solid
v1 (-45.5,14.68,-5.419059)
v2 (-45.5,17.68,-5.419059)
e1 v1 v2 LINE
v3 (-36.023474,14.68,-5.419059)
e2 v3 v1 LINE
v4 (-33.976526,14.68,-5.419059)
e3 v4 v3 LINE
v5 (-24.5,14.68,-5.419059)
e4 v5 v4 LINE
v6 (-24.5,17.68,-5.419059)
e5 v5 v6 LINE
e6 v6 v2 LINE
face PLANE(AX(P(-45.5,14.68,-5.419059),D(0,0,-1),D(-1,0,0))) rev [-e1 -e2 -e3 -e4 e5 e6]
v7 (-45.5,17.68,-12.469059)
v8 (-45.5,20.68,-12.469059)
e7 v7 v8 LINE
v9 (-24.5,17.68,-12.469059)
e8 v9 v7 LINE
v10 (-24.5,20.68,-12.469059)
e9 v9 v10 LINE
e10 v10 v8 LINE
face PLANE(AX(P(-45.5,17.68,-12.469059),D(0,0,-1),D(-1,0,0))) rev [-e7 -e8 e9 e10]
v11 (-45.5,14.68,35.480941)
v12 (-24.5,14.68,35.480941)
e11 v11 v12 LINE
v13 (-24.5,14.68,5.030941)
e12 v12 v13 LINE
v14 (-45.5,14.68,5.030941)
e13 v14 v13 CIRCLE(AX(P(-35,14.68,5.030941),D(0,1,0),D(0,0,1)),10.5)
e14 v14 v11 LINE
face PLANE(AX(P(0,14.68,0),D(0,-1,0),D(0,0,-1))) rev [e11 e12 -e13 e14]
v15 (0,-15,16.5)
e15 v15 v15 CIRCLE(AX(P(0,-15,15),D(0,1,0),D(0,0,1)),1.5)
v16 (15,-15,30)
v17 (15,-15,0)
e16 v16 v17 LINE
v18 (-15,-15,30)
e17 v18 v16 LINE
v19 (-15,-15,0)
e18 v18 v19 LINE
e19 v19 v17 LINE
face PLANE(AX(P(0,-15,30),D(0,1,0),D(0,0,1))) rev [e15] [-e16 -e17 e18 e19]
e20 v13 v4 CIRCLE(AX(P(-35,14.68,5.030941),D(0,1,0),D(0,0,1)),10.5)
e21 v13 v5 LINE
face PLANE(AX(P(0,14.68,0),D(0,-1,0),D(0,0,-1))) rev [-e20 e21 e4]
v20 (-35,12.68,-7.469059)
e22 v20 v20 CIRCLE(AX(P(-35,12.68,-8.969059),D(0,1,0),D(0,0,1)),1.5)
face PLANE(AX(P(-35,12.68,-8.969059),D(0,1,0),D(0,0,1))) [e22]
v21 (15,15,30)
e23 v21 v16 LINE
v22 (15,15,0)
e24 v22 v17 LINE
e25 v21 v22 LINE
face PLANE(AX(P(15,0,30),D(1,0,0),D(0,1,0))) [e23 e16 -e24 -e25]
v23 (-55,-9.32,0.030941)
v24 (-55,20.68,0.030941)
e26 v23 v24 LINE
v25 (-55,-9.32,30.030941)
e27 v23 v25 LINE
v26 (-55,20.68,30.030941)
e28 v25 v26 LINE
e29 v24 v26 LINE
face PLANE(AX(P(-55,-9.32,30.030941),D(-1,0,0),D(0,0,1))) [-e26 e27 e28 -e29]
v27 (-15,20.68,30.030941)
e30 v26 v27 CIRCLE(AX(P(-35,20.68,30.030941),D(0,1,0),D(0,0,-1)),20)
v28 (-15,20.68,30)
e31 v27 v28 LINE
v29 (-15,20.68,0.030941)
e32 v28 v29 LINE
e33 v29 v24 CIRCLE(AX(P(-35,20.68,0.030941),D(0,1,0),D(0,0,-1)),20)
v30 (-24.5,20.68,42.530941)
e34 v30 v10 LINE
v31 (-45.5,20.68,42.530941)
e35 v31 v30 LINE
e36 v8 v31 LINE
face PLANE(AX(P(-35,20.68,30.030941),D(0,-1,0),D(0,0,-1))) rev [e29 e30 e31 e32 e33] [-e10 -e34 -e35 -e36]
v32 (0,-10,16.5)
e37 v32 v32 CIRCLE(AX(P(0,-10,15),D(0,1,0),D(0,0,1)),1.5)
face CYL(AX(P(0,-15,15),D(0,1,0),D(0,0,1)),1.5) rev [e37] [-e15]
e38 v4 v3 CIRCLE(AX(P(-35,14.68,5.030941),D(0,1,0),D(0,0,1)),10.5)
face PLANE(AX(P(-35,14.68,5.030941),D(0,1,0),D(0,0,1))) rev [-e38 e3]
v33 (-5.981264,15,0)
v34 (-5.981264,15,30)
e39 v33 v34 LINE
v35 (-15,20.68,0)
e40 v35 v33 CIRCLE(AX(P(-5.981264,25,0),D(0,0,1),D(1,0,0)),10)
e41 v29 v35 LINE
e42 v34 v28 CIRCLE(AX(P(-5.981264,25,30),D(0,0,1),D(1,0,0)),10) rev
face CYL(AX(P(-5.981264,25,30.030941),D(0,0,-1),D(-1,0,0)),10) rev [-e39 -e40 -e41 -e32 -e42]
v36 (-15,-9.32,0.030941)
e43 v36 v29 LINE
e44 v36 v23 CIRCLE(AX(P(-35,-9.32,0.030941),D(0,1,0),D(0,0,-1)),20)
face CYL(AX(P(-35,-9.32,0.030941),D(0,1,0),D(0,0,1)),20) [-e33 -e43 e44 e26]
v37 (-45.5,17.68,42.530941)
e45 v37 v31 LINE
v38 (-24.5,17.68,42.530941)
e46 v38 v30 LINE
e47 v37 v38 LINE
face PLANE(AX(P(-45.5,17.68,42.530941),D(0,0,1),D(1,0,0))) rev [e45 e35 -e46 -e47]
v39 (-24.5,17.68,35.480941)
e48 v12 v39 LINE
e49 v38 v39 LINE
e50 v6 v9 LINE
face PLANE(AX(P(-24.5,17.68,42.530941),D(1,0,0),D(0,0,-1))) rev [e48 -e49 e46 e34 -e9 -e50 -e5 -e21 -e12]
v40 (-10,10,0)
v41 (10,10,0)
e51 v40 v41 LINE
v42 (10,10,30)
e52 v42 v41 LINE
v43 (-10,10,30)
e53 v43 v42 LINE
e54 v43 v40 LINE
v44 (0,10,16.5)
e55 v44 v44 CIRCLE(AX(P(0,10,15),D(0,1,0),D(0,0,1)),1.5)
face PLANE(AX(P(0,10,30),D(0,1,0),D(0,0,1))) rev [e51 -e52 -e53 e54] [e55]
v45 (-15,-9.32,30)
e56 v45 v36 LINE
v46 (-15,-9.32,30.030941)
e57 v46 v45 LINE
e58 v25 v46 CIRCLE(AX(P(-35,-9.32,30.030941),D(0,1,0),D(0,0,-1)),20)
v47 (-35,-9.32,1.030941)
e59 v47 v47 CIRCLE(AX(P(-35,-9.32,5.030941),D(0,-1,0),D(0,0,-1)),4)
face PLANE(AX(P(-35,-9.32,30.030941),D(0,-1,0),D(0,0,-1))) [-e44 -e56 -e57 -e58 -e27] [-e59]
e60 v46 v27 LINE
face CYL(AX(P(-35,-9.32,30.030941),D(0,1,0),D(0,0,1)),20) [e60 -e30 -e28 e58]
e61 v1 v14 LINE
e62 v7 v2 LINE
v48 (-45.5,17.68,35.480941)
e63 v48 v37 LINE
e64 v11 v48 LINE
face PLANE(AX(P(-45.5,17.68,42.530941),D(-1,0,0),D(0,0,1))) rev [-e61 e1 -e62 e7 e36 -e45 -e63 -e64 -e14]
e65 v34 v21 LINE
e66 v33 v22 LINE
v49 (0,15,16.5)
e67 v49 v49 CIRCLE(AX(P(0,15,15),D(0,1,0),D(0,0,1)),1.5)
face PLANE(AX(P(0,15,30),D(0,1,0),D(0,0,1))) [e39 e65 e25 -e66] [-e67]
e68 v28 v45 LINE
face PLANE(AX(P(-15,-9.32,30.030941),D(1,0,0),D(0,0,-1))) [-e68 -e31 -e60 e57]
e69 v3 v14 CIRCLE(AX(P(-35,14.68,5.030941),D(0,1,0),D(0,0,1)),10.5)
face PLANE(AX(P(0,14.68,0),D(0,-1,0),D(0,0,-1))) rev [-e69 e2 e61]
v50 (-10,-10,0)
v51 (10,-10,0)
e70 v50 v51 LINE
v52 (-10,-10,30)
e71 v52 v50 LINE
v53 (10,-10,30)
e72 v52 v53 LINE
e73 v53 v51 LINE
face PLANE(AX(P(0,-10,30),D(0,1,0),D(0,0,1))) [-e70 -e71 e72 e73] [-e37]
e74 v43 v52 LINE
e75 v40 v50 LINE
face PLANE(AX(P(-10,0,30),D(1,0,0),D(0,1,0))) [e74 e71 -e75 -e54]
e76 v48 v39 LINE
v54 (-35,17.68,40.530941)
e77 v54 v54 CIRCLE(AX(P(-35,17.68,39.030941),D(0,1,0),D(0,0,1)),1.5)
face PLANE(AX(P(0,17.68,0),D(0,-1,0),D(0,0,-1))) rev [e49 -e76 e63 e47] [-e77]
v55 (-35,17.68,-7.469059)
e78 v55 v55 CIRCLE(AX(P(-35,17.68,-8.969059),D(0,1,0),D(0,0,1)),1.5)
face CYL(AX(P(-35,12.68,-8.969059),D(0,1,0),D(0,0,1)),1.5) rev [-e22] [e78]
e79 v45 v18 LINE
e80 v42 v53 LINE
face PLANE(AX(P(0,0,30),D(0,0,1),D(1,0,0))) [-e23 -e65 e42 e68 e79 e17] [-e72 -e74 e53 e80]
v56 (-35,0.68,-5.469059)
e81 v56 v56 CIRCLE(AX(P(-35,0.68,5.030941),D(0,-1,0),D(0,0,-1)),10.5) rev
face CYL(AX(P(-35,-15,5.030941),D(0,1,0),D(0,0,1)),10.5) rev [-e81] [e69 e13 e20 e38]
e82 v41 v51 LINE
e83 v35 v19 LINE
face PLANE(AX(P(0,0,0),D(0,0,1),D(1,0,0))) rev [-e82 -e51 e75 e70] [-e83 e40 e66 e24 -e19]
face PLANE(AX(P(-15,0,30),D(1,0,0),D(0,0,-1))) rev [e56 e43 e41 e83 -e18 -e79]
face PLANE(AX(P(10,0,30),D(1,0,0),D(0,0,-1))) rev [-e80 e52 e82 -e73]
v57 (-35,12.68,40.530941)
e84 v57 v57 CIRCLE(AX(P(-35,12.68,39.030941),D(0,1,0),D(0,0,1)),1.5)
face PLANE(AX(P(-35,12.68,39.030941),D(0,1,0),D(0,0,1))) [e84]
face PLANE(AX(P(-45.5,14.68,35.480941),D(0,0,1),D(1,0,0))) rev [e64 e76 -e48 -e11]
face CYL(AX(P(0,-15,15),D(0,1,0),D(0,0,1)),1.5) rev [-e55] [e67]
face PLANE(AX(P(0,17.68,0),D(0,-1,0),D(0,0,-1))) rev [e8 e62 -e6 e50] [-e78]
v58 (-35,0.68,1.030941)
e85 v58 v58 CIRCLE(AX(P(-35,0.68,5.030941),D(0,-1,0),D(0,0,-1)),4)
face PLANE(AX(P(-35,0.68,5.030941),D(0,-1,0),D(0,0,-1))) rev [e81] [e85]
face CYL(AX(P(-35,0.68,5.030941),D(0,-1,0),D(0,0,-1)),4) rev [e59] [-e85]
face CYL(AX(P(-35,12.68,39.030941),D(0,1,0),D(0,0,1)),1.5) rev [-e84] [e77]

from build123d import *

# Parameters (mm, degrees)
SKETCH1_W           = 30
SKETCH1_H           = 30
SKETCH1_W_2         = 20
SKETCH1_H_2         = 20
BOSS_EXTRUDE2_DEPTH = 30
BOSS_EXTRUDE3_DEPTH = 30
SKETCH6_W           = 21
SKETCH6_H           = 55
CUT_EXTRUDE1_DEPTH  = 3
SKETCH7_R           = 1.5
CUT_EXTRUDE2_DEPTH  = 5
SKETCH8_W           = 21
SKETCH8_H           = 40.9
CUT_EXTRUDE3_DEPTH  = 3
SKETCH9_R           = 10.5
CUT_EXTRUDE4_DEPTH  = 81.056214629
BOSS_EXTRUDE4_START = -10
SKETCH10_R          = 10.5
SKETCH10_R_2        = 4
BOSS_EXTRUDE4_DEPTH = 10
FILLET1_R           = 10
SKETCH11_R          = 1.5
CUT_EXTRUDE5_DEPTH  = 81.175402093


with BuildPart() as part:
    # Sketch1 → Boss-Extrude2 (new body)
    with BuildSketch(Plane.XY):
        Rectangle(SKETCH1_W, SKETCH1_H)
        Rectangle(SKETCH1_W_2, SKETCH1_H_2, mode=Mode.SUBTRACT)
    extrude(amount=BOSS_EXTRUDE2_DEPTH)

    # Sketch5 → Boss-Extrude3 (add)
    with BuildSketch(Plane(origin=(0, 20.68, 0), x_dir=(1, 0, 0), z_dir=(0, 1, 0))):
        with BuildLine():
            Line((-15, -30.030941434), (-15, -0.030941434))
            ThreePointArc((-15, -0.030941434), (-35, 19.969058566), (-55, -0.030941434))
            Line((-55, -0.030941434), (-55, -30.030941434))
            ThreePointArc((-55, -30.030941434), (-35, -50.030941434), (-15, -30.030941434))
        make_face()
    extrude(amount=-BOSS_EXTRUDE3_DEPTH)

    # Sketch6 → Cut-Extrude1 (cut)
    with BuildSketch(Plane(origin=(0, 20.68, 0), x_dir=(1, 0, 0), z_dir=(0, 1, 0))):
        with Locations((-35, -15.030941434)):
            Rectangle(SKETCH6_W, SKETCH6_H)
    extrude(amount=-CUT_EXTRUDE1_DEPTH, mode=Mode.SUBTRACT)

    # Sketch7 → Cut-Extrude2 (cut)
    with BuildSketch(Plane(origin=(0, 17.68, 0), x_dir=(1, 0, 0), z_dir=(0, 1, 0))):
        with Locations(Location((-35, -39.030941434, 0), (0, 0, 270))):
            Circle(SKETCH7_R)
        with Locations(Location((-35, 8.969058566, 0), (0, 0, 270))):
            Circle(SKETCH7_R)
    extrude(amount=-CUT_EXTRUDE2_DEPTH, mode=Mode.SUBTRACT)

    # Sketch8 → Cut-Extrude3 (cut)
    with BuildSketch(Plane(origin=(0, 17.68, 0), x_dir=(1, 0, 0), z_dir=(0, 1, 0))):
        with Locations((-35, -15.030941434)):
            Rectangle(SKETCH8_W, SKETCH8_H)
    extrude(amount=-CUT_EXTRUDE3_DEPTH, mode=Mode.SUBTRACT)

    # Sketch9 → Cut-Extrude4 (cut, through all)
    with BuildSketch(Plane(origin=(0, 14.68, 0), x_dir=(1, 0, 0), z_dir=(0, 1, 0))):
        with Locations(Location((-35, -5.030941434, 0), (0, 0, 180))):
            Circle(SKETCH9_R)
    extrude(amount=-CUT_EXTRUDE4_DEPTH, mode=Mode.SUBTRACT)

    # Sketch10 → Boss-Extrude4 (add)
    with BuildSketch(Plane.XZ.offset(9.32).offset(BOSS_EXTRUDE4_START)):
        with Locations(Location((-35, 5.030941434, 0), (0, 0, 180))):
            Circle(SKETCH10_R)
        with Locations(Location((-35, 5.030941434, 0), (0, 0, 270))):
            Circle(SKETCH10_R_2, mode=Mode.SUBTRACT)
    extrude(amount=BOSS_EXTRUDE4_DEPTH)

    # Fillet1
    # the kernel refuses this fillet: 10 mm, written as the material it adds along each edge
    with BuildSketch(Plane(origin=(-15, 15, -22.515898699), x_dir=(1, 0, 0), z_dir=(0, 0, 1))) as fillet1_piece_1_section:
        with BuildLine():
            CenterArc((9.018736053, 10), FILLET1_R, 205.594552278, 64.405447722)
            Line((0, 5.68), (0, 0))
            Line((0, 0), (9.018736053, 0))
        make_face()
    fillet1_piece_1 = extrude(amount=52.515898699, mode=Mode.PRIVATE)
    fillet1_piece_1 = split(fillet1_piece_1, bisect_by=Plane(origin=(-11.321087315, 16.521398323, 0), z_dir=(0, 0, 1)), keep=Keep.TOP, mode=Mode.PRIVATE)
    add(fillet1_piece_1)

    # Sketch11 → Cut-Extrude5 (cut, through all)
    with BuildSketch(Plane(origin=(0, 15, 0), x_dir=(1, 0, 0), z_dir=(0, 1, 0))):
        with Locations(Location((0, -15, 0), (0, 0, 270))):
            Circle(SKETCH11_R)
    extrude(amount=-CUT_EXTRUDE5_DEPTH, mode=Mode.SUBTRACT)


solid = part.part
